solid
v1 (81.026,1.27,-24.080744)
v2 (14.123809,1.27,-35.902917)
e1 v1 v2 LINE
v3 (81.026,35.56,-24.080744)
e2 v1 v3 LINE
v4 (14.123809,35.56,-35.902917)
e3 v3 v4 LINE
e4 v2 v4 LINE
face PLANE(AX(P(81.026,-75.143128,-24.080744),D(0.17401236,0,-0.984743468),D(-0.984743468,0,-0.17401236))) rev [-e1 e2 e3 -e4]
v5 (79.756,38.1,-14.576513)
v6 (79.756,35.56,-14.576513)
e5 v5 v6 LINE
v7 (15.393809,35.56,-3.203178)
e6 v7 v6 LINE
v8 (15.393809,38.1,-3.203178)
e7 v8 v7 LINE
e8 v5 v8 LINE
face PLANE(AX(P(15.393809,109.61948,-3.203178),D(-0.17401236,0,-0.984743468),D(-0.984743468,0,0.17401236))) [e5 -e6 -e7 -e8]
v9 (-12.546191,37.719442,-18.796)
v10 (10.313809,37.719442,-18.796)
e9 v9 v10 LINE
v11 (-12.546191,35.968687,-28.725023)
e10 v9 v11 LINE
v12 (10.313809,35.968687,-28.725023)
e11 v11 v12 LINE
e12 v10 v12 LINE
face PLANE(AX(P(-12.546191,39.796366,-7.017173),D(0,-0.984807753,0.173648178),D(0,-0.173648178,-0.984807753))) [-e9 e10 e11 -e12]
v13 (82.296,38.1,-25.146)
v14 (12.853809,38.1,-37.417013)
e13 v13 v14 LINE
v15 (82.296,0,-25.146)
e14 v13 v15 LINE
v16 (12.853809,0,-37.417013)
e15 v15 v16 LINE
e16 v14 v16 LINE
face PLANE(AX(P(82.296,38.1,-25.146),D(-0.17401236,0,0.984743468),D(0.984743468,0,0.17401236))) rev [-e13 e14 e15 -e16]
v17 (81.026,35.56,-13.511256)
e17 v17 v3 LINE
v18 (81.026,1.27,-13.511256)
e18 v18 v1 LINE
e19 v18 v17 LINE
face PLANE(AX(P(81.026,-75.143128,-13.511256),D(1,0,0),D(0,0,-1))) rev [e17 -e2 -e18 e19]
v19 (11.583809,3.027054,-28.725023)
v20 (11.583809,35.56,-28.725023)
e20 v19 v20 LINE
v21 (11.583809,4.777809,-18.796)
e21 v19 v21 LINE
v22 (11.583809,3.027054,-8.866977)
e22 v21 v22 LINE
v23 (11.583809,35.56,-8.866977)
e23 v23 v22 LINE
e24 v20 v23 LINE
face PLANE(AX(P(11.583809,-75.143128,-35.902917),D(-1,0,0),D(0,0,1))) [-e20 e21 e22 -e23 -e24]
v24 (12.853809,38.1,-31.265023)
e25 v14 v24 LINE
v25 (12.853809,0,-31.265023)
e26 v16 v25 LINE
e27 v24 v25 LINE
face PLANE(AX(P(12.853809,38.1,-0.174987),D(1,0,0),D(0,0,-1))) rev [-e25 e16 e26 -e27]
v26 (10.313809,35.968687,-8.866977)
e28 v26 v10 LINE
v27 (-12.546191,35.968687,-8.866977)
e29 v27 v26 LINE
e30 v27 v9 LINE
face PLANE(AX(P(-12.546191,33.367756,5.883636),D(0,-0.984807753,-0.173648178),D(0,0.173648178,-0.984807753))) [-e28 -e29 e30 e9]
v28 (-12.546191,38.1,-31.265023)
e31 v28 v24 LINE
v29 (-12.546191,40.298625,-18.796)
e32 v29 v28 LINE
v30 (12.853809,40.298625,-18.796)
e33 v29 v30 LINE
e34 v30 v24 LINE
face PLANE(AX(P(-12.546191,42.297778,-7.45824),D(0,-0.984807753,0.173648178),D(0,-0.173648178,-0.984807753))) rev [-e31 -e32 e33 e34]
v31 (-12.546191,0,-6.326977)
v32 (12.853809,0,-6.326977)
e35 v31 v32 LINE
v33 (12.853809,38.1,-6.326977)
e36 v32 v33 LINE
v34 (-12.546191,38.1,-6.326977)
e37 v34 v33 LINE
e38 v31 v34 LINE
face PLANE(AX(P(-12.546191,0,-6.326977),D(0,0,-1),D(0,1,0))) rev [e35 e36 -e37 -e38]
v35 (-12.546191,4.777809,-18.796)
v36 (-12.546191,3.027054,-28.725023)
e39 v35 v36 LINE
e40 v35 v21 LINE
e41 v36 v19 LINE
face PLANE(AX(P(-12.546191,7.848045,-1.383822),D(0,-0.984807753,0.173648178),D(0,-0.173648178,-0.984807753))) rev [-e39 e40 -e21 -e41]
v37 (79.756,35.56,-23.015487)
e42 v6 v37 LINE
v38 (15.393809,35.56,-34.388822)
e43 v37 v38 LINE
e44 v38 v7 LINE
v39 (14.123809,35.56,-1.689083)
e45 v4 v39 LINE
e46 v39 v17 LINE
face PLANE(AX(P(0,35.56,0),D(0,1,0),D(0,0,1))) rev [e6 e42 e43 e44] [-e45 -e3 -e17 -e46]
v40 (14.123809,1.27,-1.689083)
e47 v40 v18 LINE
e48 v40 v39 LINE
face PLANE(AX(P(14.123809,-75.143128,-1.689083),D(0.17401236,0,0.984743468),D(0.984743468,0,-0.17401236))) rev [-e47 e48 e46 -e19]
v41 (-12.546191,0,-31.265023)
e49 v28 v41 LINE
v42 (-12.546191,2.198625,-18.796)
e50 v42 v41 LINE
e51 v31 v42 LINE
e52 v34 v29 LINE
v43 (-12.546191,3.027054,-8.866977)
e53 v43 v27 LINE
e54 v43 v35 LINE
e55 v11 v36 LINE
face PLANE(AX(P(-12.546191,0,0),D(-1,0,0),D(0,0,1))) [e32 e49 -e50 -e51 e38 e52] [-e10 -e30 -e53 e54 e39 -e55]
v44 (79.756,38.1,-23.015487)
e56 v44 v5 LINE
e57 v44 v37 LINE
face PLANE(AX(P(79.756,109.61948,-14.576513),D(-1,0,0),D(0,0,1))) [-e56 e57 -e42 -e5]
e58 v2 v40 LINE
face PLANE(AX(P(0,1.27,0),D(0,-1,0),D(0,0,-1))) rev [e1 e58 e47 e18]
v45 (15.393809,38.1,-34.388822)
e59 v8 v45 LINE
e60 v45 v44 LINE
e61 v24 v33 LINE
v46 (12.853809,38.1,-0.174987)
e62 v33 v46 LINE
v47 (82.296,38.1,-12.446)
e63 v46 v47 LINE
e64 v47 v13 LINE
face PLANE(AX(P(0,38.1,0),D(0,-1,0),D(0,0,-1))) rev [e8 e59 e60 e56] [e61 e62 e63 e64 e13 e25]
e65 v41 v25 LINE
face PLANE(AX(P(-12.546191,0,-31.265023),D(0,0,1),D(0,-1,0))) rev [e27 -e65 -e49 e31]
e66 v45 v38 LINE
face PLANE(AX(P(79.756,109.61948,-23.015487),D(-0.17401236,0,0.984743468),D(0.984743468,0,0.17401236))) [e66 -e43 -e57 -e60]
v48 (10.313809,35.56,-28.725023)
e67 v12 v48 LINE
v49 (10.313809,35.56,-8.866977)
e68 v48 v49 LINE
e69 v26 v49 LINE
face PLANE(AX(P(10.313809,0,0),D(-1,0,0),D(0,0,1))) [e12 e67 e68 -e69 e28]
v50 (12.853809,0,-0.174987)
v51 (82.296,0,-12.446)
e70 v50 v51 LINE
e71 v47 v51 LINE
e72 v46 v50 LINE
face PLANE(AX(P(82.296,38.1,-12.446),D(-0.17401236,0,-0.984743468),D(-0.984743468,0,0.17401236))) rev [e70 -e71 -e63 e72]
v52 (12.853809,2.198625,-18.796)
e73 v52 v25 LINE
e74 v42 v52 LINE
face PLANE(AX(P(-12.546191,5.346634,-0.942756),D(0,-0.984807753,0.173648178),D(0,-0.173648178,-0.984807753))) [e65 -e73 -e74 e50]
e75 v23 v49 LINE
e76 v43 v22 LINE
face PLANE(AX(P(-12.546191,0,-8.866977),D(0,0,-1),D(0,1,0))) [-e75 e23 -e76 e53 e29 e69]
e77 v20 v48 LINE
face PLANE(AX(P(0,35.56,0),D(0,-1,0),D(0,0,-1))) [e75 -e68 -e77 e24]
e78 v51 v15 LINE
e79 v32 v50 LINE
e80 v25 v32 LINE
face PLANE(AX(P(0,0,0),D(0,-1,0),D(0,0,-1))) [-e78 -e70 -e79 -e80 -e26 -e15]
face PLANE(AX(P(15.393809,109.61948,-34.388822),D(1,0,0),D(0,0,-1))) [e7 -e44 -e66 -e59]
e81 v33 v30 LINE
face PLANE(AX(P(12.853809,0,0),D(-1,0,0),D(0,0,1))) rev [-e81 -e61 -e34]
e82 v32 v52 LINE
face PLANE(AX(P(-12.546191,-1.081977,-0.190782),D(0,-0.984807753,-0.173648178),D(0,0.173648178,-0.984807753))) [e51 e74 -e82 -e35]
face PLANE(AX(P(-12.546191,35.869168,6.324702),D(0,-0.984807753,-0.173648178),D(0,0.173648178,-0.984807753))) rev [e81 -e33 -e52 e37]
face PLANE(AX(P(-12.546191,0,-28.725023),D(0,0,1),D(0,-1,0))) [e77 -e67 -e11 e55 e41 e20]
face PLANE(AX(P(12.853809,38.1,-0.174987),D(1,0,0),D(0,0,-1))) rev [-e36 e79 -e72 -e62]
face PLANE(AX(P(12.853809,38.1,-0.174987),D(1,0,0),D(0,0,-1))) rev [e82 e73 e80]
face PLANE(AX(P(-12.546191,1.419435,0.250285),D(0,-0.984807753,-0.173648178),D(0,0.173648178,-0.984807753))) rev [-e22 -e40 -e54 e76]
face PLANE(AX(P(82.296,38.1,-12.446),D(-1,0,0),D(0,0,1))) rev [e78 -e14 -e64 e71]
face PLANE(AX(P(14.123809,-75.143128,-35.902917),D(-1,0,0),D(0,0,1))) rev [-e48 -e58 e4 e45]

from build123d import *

# Parameters (mm, degrees)
BOSS_EXTRUDE1_DEPTH = 38.1
CUT_EXTRUDE1_DEPTH  = 2.54
CUT_EXTRUDE2_DEPTH  = 34.29
BOSS_EXTRUDE2_DEPTH = 25.4
SHELL1_START        = -12.546191045
SHELL1_DEPTH        = 24.13
SHELL1_2_DEPTH      = 22.86


# Read off the part's stored shape, not the designer's step: Shell1
with BuildPart() as part:
    # Sketch1 → Boss-Extrude1 (new body)
    with BuildSketch(Plane(origin=(0, 0, 0), x_dir=(1, 0, 0), z_dir=(0, 1, 0))):
        Polygon((12.853808955, 0.174987325), (12.853808955, 37.417012675), (82.296, 25.146), (82.296, 12.446), align=None)
    extrude(amount=BOSS_EXTRUDE1_DEPTH)

    # Sketch3 → Cut-Extrude1 (cut)
    with BuildSketch(Plane(origin=(0, 35.56, 0), x_dir=(1, 0, 0), z_dir=(0, 1, 0))):
        Polygon((79.756, 14.576512841), (79.756, 23.015487159), (15.393808955, 34.388821586), (15.393808955, 3.203178414), align=None)
    extrude(amount=CUT_EXTRUDE1_DEPTH, mode=Mode.SUBTRACT)

    # Sketch6 → Cut-Extrude2 (cut)
    with BuildSketch(Plane(origin=(0, 35.56, 0), x_dir=(1, 0, 0), z_dir=(0, 1, 0))):
        Polygon((81.026, 13.511256421), (81.026, 24.080743579), (14.123808955, 35.90291713), (14.123808955, 1.68908287), align=None)
    extrude(amount=-CUT_EXTRUDE2_DEPTH, mode=Mode.SUBTRACT)

    # Sketch8 → Boss-Extrude2 (add)
    with BuildSketch(Plane.ZY.offset(-12.853808955)):
        Polygon((-31.26502256, 38.1), (-31.26502256, 0), (-18.796, 2.1986251), (-6.32697744, 0), (-6.32697744, 38.1), (-18.796, 40.2986251), align=None)
    extrude(amount=BOSS_EXTRUDE2_DEPTH)

    # Shell1 outline → Shell1 (cut)
    with BuildSketch(Plane.YZ.offset(SHELL1_START)):
        Polygon((35.56, -28.72502256), (35.56, -8.86697744), (3.027054125, -8.86697744), (4.777808695, -18.796), (3.027054125, -28.72502256), align=None)
    extrude(amount=SHELL1_DEPTH, mode=Mode.SUBTRACT)

    # Shell1 2 outline → Shell1 2 (cut)
    with BuildSketch(Plane.YZ.offset(SHELL1_START)):
        Polygon((35.968686937, -8.86697744), (35.56, -8.86697744), (35.56, -28.72502256), (35.968686937, -28.72502256), (37.719441506, -18.796), align=None)
    extrude(amount=SHELL1_2_DEPTH, mode=Mode.SUBTRACT)


solid = part.part
